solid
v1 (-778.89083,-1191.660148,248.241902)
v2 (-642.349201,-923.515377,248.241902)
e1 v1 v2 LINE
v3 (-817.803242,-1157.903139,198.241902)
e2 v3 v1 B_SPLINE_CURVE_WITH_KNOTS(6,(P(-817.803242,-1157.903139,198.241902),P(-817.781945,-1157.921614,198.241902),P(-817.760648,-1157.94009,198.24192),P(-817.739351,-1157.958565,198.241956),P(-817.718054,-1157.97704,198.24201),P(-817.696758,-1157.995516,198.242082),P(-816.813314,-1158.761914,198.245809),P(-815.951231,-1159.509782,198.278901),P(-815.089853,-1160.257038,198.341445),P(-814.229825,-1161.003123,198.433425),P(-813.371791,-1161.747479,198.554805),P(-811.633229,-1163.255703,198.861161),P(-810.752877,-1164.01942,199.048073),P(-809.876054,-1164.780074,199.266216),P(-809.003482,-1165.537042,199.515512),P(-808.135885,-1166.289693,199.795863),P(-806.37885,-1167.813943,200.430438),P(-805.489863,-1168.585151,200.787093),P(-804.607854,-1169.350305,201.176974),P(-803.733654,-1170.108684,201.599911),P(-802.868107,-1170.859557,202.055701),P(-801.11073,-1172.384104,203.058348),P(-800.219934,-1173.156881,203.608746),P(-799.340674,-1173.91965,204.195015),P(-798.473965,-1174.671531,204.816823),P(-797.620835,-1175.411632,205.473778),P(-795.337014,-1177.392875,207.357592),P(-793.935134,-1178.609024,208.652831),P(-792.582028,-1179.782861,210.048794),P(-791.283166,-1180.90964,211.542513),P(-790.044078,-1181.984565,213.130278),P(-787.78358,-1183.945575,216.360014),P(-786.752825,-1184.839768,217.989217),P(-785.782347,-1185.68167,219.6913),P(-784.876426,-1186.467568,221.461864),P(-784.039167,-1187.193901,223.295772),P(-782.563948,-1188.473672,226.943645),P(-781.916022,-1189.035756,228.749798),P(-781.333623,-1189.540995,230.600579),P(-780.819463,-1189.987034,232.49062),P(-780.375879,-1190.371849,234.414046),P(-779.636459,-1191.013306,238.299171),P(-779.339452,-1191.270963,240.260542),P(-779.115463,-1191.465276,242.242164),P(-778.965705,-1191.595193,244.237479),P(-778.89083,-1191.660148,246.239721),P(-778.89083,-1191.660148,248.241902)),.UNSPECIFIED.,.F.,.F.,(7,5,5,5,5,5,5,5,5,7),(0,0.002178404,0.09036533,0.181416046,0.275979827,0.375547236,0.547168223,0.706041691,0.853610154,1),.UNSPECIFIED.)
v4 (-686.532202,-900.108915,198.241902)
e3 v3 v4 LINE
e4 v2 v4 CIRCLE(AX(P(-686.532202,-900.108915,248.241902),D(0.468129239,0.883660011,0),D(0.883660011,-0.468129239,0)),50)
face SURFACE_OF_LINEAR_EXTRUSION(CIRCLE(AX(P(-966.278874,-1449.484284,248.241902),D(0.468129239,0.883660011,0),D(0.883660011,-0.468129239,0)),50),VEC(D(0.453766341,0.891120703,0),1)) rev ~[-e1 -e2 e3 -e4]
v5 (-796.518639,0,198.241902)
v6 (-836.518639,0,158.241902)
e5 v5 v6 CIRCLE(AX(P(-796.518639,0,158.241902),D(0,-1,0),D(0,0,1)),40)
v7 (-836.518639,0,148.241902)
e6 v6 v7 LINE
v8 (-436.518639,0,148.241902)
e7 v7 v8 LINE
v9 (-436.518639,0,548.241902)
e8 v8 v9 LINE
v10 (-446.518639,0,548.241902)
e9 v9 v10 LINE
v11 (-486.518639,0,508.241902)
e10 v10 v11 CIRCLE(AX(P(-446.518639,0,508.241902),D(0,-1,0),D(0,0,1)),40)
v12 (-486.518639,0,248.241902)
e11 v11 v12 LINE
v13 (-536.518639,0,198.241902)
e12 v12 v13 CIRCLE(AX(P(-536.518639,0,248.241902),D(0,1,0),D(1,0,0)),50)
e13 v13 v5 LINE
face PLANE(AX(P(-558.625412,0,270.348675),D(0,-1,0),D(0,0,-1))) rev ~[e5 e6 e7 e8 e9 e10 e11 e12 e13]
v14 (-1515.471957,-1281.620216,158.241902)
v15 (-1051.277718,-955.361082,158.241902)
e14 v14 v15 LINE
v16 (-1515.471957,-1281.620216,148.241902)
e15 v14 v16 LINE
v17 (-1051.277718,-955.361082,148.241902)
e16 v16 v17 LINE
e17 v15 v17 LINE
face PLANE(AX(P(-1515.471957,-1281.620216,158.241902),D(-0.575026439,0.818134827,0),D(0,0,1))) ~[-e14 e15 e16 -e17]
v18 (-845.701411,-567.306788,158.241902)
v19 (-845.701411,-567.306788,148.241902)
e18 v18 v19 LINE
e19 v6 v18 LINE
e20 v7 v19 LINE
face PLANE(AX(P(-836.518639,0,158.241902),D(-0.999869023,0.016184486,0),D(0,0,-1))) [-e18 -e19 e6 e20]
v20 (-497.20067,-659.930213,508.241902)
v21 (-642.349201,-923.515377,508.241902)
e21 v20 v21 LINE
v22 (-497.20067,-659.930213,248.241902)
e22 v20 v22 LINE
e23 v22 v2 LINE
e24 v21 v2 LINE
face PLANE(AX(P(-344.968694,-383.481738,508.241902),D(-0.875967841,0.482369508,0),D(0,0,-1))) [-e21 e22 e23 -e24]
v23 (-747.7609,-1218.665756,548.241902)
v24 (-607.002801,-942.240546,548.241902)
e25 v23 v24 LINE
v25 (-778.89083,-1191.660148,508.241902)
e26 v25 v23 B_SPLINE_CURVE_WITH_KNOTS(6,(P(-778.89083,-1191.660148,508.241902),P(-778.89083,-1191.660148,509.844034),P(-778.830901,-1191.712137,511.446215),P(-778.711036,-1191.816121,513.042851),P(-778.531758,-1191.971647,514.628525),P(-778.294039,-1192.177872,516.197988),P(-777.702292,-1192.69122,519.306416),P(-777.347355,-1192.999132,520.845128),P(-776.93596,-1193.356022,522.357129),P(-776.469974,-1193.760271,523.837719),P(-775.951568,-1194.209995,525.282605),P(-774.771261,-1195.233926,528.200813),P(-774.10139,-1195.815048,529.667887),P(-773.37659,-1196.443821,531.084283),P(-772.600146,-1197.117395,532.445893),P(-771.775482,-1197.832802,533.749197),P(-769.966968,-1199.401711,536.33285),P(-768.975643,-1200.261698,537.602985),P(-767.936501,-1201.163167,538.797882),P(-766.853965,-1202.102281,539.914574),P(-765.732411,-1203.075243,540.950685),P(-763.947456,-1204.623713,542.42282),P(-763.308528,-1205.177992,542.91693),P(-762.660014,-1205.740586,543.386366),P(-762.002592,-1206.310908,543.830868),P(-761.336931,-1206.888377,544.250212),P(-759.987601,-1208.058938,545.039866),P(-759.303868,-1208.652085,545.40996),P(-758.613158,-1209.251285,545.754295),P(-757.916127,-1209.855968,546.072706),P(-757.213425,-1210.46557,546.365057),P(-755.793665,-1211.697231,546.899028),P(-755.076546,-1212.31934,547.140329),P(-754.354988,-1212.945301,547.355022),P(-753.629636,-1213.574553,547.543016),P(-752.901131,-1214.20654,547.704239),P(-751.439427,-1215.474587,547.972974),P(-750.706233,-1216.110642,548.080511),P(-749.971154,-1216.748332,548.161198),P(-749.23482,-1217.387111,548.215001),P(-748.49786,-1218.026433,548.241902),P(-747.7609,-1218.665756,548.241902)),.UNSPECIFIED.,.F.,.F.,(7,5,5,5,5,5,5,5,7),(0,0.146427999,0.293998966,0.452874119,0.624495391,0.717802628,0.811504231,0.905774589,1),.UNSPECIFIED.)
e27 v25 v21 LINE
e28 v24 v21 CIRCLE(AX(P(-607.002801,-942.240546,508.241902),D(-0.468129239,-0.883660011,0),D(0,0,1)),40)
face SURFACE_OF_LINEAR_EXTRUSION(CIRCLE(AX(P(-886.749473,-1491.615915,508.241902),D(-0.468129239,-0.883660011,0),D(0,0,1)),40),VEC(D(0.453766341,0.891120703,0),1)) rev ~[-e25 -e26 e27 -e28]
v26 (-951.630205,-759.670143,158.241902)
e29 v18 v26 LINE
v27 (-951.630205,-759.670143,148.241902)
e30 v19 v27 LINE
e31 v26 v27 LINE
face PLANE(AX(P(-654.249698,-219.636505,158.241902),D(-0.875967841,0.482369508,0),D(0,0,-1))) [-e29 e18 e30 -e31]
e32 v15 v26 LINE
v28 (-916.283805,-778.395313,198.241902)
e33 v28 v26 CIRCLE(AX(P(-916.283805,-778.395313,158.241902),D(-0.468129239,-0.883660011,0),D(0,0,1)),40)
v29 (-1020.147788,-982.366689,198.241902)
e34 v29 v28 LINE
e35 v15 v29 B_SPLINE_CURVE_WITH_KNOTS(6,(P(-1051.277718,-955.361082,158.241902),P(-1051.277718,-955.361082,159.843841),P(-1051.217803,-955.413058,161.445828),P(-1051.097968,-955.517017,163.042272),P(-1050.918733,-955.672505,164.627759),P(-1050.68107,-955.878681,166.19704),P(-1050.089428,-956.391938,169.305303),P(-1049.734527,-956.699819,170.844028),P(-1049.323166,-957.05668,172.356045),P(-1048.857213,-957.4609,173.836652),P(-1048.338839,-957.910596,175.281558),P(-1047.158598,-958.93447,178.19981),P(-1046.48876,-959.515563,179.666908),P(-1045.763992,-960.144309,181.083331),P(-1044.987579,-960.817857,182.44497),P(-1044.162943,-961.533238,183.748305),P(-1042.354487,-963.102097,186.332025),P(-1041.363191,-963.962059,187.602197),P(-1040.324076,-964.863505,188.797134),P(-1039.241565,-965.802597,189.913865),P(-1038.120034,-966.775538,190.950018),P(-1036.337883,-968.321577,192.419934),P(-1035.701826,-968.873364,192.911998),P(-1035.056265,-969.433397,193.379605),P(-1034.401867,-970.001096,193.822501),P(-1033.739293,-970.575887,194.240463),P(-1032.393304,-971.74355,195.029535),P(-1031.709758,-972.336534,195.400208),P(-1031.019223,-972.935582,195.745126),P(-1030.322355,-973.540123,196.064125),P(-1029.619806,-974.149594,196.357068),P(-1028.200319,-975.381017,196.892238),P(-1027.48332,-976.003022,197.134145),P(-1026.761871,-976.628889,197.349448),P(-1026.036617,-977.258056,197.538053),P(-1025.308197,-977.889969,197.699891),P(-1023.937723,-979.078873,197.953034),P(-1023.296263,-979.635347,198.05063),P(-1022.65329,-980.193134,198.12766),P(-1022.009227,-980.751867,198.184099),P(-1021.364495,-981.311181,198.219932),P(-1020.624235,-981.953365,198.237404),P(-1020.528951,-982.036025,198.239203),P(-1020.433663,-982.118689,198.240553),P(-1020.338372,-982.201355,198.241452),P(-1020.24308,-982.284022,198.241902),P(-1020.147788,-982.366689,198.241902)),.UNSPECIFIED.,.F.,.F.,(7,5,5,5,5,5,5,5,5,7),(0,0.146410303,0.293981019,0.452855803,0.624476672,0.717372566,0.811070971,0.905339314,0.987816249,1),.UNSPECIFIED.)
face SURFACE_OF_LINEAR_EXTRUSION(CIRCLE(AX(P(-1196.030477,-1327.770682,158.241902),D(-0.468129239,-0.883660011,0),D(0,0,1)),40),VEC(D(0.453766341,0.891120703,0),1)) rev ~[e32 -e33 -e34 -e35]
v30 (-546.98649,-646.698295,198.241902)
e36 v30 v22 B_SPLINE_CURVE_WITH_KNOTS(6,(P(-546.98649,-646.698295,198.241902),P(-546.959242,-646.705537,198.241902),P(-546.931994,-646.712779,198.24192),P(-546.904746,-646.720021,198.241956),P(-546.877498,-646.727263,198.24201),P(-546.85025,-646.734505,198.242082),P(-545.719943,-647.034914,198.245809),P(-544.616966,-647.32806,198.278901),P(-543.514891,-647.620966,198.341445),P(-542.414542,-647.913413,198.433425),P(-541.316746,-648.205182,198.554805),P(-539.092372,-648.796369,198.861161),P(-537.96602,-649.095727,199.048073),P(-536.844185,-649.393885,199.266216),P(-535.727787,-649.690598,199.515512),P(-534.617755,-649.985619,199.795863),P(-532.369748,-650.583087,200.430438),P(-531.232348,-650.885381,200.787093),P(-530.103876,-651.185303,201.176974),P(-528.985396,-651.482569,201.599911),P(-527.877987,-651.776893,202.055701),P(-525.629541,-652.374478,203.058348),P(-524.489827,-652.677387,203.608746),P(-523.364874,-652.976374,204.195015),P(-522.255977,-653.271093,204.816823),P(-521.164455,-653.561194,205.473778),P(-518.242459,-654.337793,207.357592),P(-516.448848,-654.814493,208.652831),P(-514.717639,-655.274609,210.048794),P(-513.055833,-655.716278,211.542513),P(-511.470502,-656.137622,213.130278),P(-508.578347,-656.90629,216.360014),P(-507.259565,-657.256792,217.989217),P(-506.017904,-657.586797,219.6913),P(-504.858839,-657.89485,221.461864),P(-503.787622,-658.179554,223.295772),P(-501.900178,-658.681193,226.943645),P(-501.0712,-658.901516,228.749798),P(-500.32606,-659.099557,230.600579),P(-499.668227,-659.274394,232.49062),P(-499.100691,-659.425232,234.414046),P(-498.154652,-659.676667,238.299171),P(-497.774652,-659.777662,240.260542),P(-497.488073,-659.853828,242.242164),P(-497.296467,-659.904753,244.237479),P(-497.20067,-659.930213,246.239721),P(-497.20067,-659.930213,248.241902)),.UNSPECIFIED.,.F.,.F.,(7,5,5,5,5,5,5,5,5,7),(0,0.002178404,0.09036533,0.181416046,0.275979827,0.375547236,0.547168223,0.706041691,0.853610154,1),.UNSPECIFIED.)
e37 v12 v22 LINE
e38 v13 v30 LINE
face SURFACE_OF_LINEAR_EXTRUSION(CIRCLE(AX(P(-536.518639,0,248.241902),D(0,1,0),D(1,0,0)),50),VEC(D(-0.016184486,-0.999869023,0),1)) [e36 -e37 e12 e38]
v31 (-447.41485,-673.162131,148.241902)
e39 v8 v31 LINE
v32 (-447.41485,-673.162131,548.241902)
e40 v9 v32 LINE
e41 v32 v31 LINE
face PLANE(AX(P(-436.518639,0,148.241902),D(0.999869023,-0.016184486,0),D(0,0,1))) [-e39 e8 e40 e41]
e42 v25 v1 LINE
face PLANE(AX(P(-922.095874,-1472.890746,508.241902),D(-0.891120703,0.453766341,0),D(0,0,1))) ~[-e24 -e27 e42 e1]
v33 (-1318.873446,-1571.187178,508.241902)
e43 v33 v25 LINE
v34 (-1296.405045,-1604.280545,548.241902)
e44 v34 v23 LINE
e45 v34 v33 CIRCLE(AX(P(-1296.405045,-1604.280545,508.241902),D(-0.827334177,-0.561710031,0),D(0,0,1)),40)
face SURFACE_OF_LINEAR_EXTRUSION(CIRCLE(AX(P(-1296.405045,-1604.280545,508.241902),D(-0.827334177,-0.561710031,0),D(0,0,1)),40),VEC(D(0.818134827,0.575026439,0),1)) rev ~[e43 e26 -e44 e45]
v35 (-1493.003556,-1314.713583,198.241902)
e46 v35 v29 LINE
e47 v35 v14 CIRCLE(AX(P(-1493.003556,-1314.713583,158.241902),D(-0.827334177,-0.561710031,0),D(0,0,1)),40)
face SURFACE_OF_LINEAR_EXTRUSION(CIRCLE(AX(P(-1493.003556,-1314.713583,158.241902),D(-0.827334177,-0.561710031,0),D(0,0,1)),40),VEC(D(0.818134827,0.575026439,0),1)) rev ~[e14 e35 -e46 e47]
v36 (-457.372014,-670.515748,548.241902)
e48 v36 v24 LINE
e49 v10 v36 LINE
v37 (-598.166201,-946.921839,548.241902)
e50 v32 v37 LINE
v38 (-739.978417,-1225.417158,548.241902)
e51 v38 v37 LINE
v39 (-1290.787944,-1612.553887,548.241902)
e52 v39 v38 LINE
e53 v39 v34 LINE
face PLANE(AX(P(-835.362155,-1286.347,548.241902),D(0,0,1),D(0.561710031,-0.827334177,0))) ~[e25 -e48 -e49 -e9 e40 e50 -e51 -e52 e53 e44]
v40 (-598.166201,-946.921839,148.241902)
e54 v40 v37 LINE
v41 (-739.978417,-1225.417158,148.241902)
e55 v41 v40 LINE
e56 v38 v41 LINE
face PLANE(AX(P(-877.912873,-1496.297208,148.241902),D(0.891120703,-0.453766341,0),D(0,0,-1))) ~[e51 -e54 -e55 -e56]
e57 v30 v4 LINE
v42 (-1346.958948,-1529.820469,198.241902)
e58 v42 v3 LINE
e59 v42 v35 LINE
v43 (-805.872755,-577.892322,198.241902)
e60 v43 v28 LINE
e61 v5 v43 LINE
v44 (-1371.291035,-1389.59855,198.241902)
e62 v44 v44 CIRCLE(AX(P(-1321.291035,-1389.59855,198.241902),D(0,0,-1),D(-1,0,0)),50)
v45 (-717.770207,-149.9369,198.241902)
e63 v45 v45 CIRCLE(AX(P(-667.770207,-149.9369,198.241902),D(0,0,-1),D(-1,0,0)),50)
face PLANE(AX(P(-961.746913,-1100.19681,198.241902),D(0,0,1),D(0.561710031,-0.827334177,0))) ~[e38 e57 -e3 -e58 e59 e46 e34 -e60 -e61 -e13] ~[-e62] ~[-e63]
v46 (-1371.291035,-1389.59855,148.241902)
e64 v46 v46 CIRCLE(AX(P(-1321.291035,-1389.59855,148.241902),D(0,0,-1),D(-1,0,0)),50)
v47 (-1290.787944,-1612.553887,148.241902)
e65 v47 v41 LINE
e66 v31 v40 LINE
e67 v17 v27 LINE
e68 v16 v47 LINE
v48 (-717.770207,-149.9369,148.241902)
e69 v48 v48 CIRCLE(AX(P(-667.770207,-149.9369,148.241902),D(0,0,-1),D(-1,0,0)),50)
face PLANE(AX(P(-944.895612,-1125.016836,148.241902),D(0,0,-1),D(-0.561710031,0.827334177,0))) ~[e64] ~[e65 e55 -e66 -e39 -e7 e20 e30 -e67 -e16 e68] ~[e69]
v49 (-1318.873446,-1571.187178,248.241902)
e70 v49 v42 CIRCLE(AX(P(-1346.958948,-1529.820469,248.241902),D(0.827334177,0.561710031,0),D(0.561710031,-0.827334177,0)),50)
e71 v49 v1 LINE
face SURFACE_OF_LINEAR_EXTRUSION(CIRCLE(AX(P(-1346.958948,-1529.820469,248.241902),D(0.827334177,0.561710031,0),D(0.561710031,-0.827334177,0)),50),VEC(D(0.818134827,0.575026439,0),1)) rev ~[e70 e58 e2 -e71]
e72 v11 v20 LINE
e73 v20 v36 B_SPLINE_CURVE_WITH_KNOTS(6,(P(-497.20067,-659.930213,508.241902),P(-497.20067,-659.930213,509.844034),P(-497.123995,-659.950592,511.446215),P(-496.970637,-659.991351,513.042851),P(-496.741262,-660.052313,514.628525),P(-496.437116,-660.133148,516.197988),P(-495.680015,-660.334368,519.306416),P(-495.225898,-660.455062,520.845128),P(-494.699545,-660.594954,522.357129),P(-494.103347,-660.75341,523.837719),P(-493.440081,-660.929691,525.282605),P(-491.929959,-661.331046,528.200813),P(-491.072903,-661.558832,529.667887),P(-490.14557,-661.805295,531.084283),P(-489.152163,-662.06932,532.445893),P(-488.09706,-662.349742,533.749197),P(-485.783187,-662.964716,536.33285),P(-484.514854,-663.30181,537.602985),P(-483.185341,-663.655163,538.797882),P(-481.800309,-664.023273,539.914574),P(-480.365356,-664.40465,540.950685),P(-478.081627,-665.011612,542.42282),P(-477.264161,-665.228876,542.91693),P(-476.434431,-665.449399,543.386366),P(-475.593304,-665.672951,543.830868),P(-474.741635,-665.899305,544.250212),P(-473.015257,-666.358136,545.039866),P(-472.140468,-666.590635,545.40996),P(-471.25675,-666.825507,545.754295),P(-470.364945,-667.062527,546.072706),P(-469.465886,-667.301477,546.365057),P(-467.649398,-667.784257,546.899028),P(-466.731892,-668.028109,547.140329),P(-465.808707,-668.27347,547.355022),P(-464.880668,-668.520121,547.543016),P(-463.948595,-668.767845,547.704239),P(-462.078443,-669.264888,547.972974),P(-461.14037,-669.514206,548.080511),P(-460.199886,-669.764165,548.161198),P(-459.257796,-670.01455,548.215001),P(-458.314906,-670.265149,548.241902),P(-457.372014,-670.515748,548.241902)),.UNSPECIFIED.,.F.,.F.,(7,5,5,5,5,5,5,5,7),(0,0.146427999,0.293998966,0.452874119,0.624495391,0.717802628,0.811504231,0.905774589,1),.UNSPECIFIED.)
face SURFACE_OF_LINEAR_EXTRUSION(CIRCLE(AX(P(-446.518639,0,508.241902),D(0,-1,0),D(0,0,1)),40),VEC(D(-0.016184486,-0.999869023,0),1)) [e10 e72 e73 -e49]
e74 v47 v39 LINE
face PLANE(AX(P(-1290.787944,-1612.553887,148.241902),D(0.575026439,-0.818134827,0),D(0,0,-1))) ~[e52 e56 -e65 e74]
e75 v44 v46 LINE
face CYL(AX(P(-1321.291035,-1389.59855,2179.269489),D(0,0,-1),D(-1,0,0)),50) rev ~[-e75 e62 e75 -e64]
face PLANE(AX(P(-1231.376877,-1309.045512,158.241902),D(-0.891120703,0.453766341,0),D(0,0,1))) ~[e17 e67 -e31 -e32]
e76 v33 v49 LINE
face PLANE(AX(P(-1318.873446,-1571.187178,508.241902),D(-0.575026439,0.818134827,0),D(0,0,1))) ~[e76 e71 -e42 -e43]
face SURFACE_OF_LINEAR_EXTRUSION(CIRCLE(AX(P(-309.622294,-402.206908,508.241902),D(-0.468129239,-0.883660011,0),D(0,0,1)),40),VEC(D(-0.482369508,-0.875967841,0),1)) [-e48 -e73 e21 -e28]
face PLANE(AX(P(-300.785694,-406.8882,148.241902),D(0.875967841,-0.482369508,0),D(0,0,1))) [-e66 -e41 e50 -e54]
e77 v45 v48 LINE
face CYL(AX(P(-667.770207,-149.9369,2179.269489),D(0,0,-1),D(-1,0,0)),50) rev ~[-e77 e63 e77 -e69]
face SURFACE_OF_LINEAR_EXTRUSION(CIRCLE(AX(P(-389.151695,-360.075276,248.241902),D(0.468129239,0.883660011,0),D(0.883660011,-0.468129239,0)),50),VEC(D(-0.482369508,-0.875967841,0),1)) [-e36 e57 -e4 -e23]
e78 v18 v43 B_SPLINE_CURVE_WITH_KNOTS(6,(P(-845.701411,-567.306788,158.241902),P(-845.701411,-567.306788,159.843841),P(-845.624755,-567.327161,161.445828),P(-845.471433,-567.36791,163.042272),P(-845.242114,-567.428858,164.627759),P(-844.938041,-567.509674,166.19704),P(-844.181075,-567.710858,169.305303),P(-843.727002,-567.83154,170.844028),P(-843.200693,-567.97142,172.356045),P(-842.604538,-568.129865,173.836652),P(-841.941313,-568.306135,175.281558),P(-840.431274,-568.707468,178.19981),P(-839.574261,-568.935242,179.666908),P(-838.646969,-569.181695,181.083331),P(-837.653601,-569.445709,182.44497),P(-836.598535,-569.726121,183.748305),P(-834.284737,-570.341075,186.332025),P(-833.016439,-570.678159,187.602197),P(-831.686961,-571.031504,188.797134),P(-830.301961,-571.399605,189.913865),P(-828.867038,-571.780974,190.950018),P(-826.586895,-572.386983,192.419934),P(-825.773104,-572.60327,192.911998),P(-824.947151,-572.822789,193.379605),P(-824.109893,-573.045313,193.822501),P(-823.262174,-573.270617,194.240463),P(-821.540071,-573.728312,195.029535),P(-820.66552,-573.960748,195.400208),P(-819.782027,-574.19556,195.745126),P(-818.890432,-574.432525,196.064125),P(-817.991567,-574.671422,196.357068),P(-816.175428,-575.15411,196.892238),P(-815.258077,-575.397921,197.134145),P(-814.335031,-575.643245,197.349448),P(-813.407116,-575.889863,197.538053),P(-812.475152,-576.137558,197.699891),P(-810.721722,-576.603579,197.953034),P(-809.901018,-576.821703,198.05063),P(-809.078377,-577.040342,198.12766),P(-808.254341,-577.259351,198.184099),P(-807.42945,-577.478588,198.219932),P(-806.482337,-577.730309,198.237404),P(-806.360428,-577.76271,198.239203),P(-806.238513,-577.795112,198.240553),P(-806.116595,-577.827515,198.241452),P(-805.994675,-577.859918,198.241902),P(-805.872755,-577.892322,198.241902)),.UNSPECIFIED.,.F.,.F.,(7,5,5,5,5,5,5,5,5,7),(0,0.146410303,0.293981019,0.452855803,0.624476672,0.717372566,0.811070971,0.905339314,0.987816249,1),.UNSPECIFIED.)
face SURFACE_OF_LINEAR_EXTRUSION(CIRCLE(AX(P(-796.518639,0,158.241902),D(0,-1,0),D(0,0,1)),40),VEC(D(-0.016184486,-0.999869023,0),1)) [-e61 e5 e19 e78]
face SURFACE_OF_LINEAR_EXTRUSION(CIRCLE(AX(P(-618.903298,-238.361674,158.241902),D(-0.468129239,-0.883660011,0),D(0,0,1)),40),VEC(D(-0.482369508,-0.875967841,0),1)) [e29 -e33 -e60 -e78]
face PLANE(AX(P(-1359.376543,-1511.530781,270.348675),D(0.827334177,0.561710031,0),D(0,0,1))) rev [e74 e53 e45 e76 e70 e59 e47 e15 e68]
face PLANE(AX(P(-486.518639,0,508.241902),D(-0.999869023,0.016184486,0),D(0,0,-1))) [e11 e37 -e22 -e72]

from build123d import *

# Parameters (mm, degrees)
F5_D = 100
F7_D = 100


# Not quite as in the source:
# - a feature names something its author has since deleted; it is built from what else it names


with BuildPart() as f2:
    # F2: sweep along a path in F1
    with BuildLine(Plane.XY) as f2_path:
        Line((-107.3189526796, -226.6205847263), (-115.9728169441, -761.2517476082))
        Line((-115.9728169441, -761.2517476082), (-413.3533239365, -1301.2853860855))
    # F0 (on Front) → F2 (sweep)
    with BuildSketch(Plane.XZ):
        with BuildLine():
            Line((-836.5186393261, 158.2419019938), (-836.5186393261, 148.2419019938))
            Line((-836.5186393261, 148.2419019938), (-436.5186393261, 148.2419019938))
            Line((-436.5186393261, 148.2419019938), (-436.5186393261, 548.2419019938))
            Line((-436.5186393261, 548.2419019938), (-446.5186393261, 548.2419019938))
            ThreePointArc((-446.5186393261, 548.2419019938), (-474.8029105736, 536.5261732412), (-486.5186393261, 508.2419019938))
            Line((-486.5186393261, 508.2419019938), (-486.5186393261, 248.2419019938))
            ThreePointArc((-486.5186393261, 248.2419019938), (-501.1633002668, 212.8865629344), (-536.5186393261, 198.2419019938))
            Line((-536.5186393261, 198.2419019938), (-796.5186393261, 198.2419019938))
            ThreePointArc((-796.5186393261, 198.2419019938), (-824.8029105736, 186.5261732412), (-836.5186393261, 158.2419019938))
        make_face()
    sweep(path=f2_path.line, transition=Transition.RIGHT)

    # F3: F2 across face


with BuildPart() as f2_1:
    add(f2.part)
    add(f2.part.mirror(Plane(origin=(-700.4191524375, -892.7521403639, 263.9571660189), x_dir=(0.8836600113, -0.4681292389, 0), z_dir=(-0.4681292389, -0.8836600113, 0))))

    # F5 (through all)
    with Locations(Plane.XY.offset(198.2419019938)):
        with Locations((-667.7702069283, -149.9368995428)):
            Hole(F5_D / 2)

    # F7 (through all)
    with Locations(Plane.XY.offset(198.2419019938)):
        with Locations((-1321.2910347152, -1389.5985503476)):
            Hole(F7_D / 2)


solid = f2_1.part
